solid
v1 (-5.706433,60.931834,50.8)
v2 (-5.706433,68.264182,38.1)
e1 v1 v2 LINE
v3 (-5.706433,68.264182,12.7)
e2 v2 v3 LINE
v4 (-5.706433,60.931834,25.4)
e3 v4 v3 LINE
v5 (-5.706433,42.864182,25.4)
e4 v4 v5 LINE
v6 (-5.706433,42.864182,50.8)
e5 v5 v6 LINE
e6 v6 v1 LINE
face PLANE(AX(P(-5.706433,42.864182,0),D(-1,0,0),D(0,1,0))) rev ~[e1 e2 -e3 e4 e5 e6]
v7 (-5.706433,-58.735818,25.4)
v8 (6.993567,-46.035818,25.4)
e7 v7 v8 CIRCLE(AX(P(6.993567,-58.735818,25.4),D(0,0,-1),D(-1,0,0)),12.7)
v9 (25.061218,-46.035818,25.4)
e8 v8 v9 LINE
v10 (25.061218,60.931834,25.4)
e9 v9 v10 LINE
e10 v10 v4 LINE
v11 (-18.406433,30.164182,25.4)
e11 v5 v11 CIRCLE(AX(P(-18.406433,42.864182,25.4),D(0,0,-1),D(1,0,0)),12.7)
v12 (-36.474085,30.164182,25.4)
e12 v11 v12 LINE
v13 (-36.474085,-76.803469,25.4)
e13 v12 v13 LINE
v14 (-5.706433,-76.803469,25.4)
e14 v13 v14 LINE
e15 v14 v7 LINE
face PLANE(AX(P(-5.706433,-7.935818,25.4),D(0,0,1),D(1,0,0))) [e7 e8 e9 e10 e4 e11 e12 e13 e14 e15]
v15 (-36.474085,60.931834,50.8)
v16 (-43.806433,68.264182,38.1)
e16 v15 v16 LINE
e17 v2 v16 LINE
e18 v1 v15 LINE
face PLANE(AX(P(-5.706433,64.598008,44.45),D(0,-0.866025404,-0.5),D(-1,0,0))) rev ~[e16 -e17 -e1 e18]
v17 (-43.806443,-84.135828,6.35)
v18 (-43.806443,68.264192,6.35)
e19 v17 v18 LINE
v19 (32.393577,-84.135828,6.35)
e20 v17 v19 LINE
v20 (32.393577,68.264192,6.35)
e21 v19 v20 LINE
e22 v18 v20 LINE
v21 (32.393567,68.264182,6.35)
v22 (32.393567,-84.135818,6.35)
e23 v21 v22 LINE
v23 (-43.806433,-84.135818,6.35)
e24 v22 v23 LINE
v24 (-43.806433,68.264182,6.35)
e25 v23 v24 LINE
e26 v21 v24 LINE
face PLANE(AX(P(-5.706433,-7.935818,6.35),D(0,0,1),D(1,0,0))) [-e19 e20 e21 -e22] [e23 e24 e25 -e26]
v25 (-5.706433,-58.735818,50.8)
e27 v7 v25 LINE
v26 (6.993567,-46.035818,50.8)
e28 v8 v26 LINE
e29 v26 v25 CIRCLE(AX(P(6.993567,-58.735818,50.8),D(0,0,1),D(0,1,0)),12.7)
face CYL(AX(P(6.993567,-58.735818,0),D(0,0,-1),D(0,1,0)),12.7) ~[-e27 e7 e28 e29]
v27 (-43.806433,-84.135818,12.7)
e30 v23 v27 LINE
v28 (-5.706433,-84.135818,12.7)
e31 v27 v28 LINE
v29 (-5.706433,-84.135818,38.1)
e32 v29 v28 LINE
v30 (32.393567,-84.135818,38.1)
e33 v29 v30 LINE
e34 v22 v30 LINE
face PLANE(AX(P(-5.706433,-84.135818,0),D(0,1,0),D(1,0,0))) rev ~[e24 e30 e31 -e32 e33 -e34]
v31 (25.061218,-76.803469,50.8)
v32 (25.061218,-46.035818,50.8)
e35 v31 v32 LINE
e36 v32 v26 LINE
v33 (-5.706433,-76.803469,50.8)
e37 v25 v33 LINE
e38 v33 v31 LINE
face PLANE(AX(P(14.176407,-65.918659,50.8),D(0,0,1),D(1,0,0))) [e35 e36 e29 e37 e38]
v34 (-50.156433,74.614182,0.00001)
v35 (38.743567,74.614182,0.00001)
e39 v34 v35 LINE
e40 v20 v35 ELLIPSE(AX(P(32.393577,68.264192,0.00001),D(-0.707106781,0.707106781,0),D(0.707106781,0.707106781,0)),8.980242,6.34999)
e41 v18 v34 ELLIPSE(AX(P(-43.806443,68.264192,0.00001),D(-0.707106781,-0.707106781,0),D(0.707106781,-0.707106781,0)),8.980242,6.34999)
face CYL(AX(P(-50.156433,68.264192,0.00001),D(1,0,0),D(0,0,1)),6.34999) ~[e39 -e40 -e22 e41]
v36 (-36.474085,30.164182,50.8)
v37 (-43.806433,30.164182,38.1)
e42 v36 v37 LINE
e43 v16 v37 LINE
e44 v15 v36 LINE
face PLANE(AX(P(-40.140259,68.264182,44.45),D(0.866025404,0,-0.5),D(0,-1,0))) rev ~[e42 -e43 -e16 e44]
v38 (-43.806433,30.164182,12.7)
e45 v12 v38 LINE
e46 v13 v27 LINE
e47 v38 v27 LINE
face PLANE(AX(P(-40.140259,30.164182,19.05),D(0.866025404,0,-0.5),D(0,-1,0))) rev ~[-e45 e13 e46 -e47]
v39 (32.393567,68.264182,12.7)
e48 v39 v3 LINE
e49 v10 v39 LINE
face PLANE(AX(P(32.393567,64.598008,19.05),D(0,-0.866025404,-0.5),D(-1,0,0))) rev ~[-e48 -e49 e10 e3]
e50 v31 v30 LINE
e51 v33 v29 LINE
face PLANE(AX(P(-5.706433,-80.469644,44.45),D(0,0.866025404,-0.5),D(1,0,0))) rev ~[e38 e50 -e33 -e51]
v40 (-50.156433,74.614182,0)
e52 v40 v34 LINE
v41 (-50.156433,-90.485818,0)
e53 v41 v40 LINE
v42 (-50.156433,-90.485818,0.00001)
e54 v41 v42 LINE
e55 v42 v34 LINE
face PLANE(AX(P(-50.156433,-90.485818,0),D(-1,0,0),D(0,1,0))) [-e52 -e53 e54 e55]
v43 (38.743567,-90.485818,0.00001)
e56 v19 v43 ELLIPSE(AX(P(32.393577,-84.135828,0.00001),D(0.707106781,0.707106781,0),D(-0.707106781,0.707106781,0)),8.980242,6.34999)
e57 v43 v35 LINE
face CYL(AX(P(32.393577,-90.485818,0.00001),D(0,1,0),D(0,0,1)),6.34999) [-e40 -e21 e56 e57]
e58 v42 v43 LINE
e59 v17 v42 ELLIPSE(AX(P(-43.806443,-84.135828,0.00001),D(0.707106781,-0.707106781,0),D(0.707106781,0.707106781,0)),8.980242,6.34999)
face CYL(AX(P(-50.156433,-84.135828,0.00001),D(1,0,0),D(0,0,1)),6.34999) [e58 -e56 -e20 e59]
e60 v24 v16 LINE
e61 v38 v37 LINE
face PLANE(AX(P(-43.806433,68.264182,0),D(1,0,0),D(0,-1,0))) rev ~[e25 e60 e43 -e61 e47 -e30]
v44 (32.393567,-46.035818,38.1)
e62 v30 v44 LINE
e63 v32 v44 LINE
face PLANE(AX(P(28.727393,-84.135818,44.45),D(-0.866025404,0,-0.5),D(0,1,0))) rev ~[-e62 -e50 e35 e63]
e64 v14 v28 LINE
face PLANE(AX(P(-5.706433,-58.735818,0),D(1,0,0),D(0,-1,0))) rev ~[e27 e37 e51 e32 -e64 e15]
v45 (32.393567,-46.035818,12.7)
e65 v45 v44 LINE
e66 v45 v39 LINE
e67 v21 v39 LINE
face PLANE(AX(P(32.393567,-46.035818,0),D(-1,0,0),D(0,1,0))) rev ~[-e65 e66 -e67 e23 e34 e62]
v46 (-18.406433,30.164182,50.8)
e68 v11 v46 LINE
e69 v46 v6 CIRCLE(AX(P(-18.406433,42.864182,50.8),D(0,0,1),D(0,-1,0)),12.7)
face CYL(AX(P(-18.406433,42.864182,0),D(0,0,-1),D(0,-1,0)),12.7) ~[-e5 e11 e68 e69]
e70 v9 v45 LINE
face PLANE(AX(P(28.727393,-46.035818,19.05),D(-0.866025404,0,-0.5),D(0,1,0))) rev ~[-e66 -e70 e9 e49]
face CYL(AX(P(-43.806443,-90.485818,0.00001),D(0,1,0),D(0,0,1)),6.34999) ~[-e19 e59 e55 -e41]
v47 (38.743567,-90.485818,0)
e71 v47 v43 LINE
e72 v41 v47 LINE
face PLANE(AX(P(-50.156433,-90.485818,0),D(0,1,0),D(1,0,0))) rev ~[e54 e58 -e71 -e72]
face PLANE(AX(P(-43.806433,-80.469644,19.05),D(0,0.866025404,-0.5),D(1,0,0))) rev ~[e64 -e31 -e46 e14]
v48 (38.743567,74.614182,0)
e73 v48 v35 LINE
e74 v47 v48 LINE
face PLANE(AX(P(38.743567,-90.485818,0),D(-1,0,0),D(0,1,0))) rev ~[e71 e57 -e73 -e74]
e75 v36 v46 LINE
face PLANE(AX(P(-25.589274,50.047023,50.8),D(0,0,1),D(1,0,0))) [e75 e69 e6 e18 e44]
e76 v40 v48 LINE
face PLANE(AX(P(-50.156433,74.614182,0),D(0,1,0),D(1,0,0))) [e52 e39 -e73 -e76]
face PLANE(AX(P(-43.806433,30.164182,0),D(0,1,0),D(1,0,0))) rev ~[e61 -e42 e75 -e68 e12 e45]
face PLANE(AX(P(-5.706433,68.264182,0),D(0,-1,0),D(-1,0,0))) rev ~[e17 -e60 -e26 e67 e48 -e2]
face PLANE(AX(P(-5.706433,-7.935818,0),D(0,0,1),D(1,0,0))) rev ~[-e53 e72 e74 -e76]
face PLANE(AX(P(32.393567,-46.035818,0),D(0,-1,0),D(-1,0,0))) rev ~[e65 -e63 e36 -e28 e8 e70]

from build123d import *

# Parameters (mm, degrees)
F0_W       = 88.9
F0_H       = 165.1
F1_DEPTH   = 6.35
F2_DEPTH   = 25.4
F3_DEPTH   = 50.8
F4_SIZE2   = 12.7
F4_SIZE    = 7.3323484187
F4_2_SIZE2 = 12.7
F4_2_SIZE  = 7.3323484187
F4_3_SIZE2 = 12.7
F4_3_SIZE  = 7.3323484187
F5_R       = 6.34999


# Not quite as in the source:
# - a fillet or chamfer is up to 0.001 mm smaller than in the source, because OpenCascade refuses the exact size


with BuildPart() as f1:
    # F0 (on Top) → F1 (new body)
    with BuildSketch(Plane.XY):
        with Locations((-5.7064332783, -7.9358178854)):
            Rectangle(F0_W, F0_H)
        Polygon((-43.8064332783, 30.1641821146), (-43.8064332783, 68.2641821146), (-5.7064332783, 68.2641821146), (32.3935667217, 68.2641821146), (32.3935667217, -46.0358178854), (32.3935667217, -84.1358178854), (-5.7064332783, -84.1358178854), (-43.8064332783, -84.1358178854), align=None, mode=Mode.SUBTRACT)
    extrude(amount=F1_DEPTH)

    # F0 (on Top) → F2 (join)
    with BuildSketch(Plane.XY):
        with BuildLine():
            Line((-18.4064332783, 30.1641821146), (-43.8064332783, 30.1641821146))
            Line((-43.8064332783, 30.1641821146), (-43.8064332783, -84.1358178854))
            Line((-43.8064332783, -84.1358178854), (-5.7064332783, -84.1358178854))
            Line((-5.7064332783, -84.1358178854), (-5.7064332783, -58.7358178854))
            ThreePointArc((-5.7064332783, -58.7358178854), (-1.9866893994, -49.7555617643), (6.9935667217, -46.0358178854))
            Line((6.9935667217, -46.0358178854), (32.3935667217, -46.0358178854))
            Line((32.3935667217, -46.0358178854), (32.3935667217, 68.2641821146))
            Line((32.3935667217, 68.2641821146), (-5.7064332783, 68.2641821146))
            Line((-5.7064332783, 68.2641821146), (-5.7064332783, 42.8641821146))
            ThreePointArc((-5.7064332783, 42.8641821146), (-9.4261771573, 33.8839259935), (-18.4064332783, 30.1641821146))
        make_face()
    extrude(amount=F2_DEPTH)

    # F0 (on Top) → F3 (join)
    with BuildSketch(Plane.XY):
        with BuildLine():
            Line((-5.7064332783, 68.2641821146), (-43.8064332783, 68.2641821146))
            Line((-43.8064332783, 68.2641821146), (-43.8064332783, 30.1641821146))
            Line((-43.8064332783, 30.1641821146), (-18.4064332783, 30.1641821146))
            ThreePointArc((-18.4064332783, 30.1641821146), (-9.4261771573, 33.8839259935), (-5.7064332783, 42.8641821146))
            Line((-5.7064332783, 42.8641821146), (-5.7064332783, 68.2641821146))
        make_face()
        with BuildLine():
            Line((-5.7064332783, -58.7358178854), (-5.7064332783, -84.1358178854))
            Line((-5.7064332783, -84.1358178854), (32.3935667217, -84.1358178854))
            Line((32.3935667217, -84.1358178854), (32.3935667217, -46.0358178854))
            Line((32.3935667217, -46.0358178854), (6.9935667217, -46.0358178854))
            ThreePointArc((6.9935667217, -46.0358178854), (-1.9866893994, -49.7555617643), (-5.7064332783, -58.7358178854))
        make_face()
    extrude(amount=F3_DEPTH)

    # F4
    f4_edges = [f1.edges().sort_by_distance(p)[0] for p in [
        (32.393567, 11.114182, 25.4),
        (-43.806433, -26.985818, 25.4),
        (13.343567, 68.264182, 25.4),
        (-24.756433, -84.135818, 25.4),
    ]]
    f4_side = f1.faces().sort_by_distance((-5.706433, -7.935818, 25.4))[0]
    chamfer(f4_edges, length=F4_SIZE, length2=F4_SIZE2, reference=f4_side)

    # F4#2
    f4_2_edges = [f1.edges().sort_by_distance(p)[0] for p in [
        (-24.756433, 68.264182, 50.8),
        (-43.806433, 49.214182, 50.8),
    ]]
    f4_2_side = f1.faces().sort_by_distance((-25.152475, 49.610224, 50.8))[0]
    chamfer(f4_2_edges, length=F4_2_SIZE, length2=F4_2_SIZE2, reference=f4_2_side)

    # F4#3
    f4_3_edges = [f1.edges().sort_by_distance(p)[0] for p in [
        (13.343567, -84.135818, 50.8),
        (32.393567, -65.085818, 50.8),
    ]]
    f4_3_side = f1.faces().sort_by_distance((13.739609, -65.48186, 50.8))[0]
    chamfer(f4_3_edges, length=F4_3_SIZE, length2=F4_3_SIZE2, reference=f4_3_side)

    # F5 (radius 6.35 in the source; OpenCascade refuses exactly that, so slightly less here)
    f5_edges = [f1.edges().sort_by_distance(p)[0] for p in [
        (38.743567, -7.935818, 6.35),
        (-5.706433, 74.614182, 6.35),
        (-50.156433, -7.935818, 6.35),
        (-5.706433, -90.485818, 6.35),
    ]]
    fillet(f5_edges, radius=F5_R)


solid = f1.part
